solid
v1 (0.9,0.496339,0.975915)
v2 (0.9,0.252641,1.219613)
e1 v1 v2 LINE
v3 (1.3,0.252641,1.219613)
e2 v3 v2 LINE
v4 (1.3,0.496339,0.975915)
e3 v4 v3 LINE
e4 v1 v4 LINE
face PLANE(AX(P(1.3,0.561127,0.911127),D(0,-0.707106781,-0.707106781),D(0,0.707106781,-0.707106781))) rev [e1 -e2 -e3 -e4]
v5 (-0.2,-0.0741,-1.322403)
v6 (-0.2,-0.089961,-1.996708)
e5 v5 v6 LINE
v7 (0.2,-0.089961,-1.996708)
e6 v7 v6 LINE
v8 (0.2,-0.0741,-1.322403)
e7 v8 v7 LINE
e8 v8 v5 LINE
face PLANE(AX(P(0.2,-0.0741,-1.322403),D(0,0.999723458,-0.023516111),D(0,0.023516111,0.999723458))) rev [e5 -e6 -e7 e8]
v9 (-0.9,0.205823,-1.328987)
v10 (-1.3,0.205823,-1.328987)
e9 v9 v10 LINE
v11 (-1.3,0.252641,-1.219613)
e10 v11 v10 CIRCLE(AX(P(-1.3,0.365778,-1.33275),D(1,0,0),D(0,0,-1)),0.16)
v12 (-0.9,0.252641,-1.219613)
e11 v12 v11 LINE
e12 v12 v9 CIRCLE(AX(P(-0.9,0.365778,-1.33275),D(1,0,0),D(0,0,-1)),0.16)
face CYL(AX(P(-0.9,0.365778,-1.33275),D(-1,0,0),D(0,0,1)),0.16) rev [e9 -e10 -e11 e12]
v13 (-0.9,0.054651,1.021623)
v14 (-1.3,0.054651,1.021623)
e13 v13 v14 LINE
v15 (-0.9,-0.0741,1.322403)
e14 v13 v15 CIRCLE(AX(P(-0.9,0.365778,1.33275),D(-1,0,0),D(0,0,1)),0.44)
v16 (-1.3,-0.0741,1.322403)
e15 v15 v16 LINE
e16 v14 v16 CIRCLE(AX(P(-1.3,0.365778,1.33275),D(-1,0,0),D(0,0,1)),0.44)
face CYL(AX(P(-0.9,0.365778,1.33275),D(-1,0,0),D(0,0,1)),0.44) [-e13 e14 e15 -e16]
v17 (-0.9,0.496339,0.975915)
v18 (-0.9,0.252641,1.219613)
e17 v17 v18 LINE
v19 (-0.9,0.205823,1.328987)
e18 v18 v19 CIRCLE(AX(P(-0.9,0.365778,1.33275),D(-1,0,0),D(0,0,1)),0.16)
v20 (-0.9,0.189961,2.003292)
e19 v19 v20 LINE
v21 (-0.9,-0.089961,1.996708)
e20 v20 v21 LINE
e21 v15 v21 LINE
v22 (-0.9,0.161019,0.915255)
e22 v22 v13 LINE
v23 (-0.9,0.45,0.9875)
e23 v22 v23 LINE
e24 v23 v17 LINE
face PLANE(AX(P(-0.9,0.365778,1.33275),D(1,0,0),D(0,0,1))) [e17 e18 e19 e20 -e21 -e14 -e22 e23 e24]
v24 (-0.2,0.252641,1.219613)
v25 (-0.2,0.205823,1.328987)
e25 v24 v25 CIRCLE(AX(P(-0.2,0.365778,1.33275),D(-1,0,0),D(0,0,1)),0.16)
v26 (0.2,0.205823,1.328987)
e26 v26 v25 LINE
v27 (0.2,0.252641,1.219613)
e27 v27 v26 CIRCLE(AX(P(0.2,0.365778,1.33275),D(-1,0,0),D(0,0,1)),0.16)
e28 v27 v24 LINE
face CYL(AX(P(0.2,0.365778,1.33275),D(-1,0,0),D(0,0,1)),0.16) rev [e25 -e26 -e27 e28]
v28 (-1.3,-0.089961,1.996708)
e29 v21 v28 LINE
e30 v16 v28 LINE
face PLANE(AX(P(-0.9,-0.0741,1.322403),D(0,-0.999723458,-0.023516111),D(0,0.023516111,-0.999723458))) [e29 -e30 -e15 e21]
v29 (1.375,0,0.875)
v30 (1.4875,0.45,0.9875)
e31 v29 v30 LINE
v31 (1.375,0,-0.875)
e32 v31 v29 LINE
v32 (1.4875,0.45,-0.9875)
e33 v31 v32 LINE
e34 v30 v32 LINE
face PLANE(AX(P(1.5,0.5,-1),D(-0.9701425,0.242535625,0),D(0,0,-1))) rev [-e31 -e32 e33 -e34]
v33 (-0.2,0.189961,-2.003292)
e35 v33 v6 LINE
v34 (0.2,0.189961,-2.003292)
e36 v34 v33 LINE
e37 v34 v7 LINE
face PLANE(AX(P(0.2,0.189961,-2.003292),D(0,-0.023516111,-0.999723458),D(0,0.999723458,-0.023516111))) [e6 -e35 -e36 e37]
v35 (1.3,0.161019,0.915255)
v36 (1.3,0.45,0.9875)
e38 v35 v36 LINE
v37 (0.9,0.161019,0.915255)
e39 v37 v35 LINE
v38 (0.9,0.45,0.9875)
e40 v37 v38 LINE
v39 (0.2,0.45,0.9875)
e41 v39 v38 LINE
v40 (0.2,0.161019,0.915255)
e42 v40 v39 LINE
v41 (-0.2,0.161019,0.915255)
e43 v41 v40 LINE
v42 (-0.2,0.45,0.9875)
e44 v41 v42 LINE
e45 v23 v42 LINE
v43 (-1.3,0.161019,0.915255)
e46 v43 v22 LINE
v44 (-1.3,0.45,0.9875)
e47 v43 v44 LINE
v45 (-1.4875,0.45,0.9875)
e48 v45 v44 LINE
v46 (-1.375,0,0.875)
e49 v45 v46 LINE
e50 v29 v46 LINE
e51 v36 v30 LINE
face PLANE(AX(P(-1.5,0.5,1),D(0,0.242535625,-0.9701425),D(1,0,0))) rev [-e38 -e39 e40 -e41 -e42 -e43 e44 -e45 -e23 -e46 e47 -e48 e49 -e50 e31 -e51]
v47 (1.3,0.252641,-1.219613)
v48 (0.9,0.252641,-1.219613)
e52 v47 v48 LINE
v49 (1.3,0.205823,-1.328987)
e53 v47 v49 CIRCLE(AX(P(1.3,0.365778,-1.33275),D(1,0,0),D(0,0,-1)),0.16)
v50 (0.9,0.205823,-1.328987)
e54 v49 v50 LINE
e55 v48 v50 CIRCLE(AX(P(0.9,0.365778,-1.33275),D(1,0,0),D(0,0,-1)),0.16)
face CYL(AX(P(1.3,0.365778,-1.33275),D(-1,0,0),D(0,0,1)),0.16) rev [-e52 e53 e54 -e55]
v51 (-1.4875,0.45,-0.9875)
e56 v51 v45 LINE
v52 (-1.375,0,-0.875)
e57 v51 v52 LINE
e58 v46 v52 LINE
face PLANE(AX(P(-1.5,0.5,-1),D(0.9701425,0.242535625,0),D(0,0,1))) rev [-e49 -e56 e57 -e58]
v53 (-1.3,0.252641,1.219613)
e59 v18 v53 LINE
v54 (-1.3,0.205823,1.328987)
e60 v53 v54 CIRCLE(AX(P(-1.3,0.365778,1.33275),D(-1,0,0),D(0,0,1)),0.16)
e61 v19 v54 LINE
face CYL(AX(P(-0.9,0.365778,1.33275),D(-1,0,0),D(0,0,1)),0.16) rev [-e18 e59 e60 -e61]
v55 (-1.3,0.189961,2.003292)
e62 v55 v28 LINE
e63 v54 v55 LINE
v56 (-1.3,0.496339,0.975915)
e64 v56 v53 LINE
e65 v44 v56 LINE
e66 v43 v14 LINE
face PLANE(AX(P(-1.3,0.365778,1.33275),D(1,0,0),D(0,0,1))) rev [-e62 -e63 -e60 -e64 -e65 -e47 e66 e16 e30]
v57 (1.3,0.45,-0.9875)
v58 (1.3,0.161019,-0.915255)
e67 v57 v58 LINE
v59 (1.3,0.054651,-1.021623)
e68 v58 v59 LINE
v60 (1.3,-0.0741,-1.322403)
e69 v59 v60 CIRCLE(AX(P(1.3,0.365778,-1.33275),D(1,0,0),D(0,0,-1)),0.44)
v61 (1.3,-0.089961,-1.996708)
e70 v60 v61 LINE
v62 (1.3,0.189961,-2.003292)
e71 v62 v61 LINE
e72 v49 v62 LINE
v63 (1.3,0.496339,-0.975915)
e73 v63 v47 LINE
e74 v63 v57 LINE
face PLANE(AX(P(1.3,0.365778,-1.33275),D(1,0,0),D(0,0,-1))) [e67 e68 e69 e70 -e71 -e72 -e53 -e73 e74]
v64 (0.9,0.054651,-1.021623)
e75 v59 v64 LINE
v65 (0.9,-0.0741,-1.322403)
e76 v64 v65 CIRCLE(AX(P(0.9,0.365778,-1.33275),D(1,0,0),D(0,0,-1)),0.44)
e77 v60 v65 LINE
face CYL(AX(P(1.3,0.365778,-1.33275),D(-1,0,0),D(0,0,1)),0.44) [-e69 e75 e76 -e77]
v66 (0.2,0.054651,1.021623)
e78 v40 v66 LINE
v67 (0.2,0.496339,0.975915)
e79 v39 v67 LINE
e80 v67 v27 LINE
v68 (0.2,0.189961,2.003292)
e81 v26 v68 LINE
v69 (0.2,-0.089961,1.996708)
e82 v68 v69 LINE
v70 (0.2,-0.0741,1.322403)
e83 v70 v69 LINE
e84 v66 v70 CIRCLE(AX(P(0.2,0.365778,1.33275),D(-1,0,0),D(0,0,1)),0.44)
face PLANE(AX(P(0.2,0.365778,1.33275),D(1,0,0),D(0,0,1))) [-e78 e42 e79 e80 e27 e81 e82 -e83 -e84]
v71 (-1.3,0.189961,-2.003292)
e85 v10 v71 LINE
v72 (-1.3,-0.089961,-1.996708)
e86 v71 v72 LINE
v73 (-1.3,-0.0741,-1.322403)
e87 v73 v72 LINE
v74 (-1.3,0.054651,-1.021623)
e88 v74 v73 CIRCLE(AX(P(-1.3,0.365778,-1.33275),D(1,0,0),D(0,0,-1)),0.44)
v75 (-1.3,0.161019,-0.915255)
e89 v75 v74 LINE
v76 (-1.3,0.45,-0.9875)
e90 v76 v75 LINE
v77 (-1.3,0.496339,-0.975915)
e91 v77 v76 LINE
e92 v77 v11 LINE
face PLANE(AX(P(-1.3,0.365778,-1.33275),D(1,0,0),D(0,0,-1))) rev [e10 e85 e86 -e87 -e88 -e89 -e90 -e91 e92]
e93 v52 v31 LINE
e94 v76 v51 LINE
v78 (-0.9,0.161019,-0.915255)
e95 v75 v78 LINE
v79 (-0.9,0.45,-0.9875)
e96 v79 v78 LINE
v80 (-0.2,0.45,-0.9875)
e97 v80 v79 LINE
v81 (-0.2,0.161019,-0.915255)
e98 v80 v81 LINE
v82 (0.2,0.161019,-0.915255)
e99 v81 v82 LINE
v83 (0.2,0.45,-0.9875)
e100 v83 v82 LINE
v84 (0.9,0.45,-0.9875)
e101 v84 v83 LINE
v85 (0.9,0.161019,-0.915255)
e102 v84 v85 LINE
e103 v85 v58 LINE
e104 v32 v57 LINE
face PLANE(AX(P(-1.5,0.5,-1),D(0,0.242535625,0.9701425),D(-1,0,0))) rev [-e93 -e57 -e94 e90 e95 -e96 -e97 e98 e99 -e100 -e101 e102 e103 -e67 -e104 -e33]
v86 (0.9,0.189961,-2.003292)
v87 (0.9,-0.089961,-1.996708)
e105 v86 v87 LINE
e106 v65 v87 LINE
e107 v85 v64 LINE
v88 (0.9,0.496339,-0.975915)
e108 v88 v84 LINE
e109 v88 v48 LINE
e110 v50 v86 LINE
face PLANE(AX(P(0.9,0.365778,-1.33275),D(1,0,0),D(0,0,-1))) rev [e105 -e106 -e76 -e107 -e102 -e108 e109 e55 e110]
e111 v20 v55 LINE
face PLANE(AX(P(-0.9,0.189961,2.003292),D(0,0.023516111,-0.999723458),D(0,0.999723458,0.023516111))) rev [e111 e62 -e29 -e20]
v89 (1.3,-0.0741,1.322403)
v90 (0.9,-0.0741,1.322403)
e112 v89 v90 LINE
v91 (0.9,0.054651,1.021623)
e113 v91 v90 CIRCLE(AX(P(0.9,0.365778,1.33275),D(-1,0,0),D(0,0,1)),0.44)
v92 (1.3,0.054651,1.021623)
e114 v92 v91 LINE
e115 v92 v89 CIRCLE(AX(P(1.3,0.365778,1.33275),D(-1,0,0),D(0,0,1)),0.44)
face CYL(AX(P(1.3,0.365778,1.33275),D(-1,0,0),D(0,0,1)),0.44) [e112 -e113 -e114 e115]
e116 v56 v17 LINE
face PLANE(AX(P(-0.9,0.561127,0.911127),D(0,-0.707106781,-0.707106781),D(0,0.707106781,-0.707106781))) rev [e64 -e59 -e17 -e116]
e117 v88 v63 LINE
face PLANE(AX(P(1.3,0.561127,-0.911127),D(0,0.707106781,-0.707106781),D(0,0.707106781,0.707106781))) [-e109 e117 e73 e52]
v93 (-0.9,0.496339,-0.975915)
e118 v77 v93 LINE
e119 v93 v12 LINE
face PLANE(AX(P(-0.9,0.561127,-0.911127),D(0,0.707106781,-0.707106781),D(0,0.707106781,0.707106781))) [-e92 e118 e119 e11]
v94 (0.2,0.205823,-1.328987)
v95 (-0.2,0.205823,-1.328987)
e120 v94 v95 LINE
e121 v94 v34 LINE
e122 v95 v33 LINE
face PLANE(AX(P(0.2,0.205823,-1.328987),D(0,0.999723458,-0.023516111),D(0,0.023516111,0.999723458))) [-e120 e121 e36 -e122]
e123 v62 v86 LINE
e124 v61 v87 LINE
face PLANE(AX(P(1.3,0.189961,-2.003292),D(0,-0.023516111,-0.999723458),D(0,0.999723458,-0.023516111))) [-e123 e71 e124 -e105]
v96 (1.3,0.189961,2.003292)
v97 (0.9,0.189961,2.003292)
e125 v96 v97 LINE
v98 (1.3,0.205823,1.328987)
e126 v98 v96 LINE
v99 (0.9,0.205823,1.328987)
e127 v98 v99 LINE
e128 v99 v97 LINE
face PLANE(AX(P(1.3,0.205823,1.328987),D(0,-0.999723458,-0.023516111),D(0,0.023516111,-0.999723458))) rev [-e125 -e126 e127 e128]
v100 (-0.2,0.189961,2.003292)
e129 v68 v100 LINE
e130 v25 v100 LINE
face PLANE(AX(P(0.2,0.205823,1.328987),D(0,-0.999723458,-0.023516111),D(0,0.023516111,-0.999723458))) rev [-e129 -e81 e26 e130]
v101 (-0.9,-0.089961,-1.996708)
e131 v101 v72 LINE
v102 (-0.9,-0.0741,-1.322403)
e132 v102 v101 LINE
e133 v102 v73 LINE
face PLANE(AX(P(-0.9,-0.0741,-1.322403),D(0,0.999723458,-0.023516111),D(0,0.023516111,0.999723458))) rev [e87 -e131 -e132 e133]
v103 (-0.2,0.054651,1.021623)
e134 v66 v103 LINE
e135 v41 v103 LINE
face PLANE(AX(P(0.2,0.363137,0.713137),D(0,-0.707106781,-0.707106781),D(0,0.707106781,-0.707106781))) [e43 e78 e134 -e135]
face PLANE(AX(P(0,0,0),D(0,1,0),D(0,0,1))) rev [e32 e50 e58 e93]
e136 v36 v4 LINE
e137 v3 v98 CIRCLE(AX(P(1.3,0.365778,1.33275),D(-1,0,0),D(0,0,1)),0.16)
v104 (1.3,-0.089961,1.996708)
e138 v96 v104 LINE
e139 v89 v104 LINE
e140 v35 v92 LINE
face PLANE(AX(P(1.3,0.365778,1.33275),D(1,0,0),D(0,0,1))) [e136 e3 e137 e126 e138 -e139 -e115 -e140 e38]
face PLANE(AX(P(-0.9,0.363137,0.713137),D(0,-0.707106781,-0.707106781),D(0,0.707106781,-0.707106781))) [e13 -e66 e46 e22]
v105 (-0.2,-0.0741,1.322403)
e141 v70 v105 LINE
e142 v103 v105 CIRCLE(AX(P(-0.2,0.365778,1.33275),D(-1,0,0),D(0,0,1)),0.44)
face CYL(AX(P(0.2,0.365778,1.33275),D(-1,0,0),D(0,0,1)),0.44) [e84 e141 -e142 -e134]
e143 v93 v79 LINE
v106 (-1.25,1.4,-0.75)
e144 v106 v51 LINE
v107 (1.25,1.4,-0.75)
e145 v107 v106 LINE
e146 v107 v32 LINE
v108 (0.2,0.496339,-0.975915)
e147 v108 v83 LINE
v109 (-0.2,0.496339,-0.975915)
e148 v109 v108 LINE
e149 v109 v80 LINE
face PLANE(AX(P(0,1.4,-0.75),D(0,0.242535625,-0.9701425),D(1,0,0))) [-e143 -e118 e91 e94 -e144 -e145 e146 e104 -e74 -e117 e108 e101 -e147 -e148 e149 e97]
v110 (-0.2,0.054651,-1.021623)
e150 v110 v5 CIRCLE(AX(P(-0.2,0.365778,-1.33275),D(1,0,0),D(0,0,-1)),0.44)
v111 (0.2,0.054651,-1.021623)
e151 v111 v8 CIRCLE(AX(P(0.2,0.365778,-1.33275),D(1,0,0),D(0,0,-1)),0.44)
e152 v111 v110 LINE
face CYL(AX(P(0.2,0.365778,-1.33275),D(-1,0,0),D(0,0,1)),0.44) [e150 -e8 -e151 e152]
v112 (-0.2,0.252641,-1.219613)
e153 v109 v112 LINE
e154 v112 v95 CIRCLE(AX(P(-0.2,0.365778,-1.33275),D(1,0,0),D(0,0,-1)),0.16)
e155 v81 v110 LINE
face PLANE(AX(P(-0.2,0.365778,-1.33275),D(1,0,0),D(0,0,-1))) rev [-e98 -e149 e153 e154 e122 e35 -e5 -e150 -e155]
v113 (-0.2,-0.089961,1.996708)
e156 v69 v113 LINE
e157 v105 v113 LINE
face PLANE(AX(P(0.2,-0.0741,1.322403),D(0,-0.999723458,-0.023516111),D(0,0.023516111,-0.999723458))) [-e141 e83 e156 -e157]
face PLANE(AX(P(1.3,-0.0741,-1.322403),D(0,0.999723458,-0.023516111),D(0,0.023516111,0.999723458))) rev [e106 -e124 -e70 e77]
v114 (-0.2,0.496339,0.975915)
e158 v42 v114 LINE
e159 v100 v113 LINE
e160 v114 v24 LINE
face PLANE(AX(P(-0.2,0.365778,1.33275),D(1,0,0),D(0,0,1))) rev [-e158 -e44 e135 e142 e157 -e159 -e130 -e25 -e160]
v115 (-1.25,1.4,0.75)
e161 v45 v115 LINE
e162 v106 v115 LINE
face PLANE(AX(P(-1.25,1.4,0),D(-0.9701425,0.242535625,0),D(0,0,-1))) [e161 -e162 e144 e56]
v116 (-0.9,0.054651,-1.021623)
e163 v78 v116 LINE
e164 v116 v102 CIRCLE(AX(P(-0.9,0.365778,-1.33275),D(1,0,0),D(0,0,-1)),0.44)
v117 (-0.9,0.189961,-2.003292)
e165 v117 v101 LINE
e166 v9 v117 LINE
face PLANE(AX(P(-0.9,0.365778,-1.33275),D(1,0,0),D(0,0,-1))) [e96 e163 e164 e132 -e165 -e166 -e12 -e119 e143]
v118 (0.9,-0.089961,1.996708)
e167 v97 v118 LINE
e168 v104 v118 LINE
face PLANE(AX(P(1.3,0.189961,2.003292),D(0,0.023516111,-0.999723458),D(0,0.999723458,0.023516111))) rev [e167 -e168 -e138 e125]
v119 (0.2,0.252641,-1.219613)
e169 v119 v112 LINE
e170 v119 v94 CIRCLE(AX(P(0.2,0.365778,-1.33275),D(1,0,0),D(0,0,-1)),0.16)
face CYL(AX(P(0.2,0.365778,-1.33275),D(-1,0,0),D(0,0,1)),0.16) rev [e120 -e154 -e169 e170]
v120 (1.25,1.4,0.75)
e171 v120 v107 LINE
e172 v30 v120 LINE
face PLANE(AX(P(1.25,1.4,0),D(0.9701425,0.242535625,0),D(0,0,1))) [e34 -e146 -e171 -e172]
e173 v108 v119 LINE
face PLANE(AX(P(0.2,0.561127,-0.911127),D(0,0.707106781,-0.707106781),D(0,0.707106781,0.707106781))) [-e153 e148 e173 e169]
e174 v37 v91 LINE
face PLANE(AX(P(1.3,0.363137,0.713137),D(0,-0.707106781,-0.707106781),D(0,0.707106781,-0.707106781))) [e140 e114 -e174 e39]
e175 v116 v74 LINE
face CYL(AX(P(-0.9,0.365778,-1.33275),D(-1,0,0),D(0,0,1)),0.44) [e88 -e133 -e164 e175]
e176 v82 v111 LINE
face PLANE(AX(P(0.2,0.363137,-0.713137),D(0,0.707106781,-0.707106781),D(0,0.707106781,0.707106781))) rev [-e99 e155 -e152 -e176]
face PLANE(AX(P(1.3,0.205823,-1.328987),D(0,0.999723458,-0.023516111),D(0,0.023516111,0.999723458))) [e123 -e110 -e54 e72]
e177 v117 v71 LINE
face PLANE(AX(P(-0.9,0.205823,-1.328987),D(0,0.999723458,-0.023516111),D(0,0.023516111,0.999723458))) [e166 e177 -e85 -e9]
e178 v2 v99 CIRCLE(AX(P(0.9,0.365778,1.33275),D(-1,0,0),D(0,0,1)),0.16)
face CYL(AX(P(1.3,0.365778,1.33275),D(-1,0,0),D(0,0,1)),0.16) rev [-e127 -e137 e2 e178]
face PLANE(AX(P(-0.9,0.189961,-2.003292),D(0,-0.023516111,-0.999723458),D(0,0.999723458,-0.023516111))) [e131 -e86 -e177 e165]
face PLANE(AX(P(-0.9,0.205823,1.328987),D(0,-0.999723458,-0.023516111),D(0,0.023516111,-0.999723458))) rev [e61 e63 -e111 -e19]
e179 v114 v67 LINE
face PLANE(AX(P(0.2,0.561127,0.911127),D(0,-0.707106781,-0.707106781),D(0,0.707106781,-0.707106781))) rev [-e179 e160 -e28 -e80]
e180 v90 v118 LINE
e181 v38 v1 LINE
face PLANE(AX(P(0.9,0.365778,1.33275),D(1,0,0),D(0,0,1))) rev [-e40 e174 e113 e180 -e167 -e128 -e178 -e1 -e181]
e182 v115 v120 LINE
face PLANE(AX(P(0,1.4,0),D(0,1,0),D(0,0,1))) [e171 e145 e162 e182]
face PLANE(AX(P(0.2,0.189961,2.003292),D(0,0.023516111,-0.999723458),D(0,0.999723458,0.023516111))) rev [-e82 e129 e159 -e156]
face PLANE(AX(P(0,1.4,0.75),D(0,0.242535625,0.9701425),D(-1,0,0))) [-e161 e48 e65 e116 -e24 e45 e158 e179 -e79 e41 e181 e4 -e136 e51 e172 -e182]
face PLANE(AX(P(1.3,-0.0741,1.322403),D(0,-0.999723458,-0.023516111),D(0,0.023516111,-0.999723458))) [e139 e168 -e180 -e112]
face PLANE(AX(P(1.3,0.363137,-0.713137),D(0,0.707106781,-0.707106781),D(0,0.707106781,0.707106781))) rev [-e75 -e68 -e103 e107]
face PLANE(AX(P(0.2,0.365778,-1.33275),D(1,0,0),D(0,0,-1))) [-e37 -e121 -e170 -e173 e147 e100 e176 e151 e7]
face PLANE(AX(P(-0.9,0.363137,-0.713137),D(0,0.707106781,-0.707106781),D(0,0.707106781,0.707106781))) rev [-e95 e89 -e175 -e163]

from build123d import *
from OCP.BRepFilletAPI import BRepFilletAPI_MakeChamfer

# Parameters (mm, degrees)
SKETCH1_W            = 3
SKETCH1_H            = 2
IC_DEPTH             = 1.4
IC_TC_SIZE           = 1
IC_TC_SIZE2          = 0.25
IC_BC_SIZE           = 0.125
IC_BC_SIZE_2         = 0.5
LEG_EXTRUDED_DEPTH   = 0.2
LEG_P_COUNT          = 2
LEG_P_PITCH          = 1.1
LEG_P_COL_COUNT      = 2
LEG_P_COL_PITCH      = 1.1
MIRROR1_COPY_1_DEPTH = 0.2
MIRROR1_COPY_2_DEPTH = 0.2


with BuildPart() as part:
    # Sketch1 → IC (new body)
    with BuildSketch(Plane(origin=(0, 0, 0), x_dir=(1, 0, 0), z_dir=(0, 1, 0))):
        Rectangle(SKETCH1_W, SKETCH1_H)
    extrude(amount=IC_DEPTH)

    # IC TC: one chamfer whose edges measure the first distance from different faces: ONE call of the kernel's chamfer builder (chamfer() names one face for all edges)
    ic_tc_edges_1 = [part.edges().sort_by_distance(p)[0] for p in [
        (1.5, 1.4, 0),
    ]]
    ic_tc_side_1 = [part.faces().sort_by_distance(p)[0] for p in [
        (1.5, 0.7, 0),
    ]]
    ic_tc_edges_2 = [part.edges().sort_by_distance(p)[0] for p in [
        (0, 1.4, -1),
    ]]
    ic_tc_side_2 = [part.faces().sort_by_distance(p)[0] for p in [
        (0, 0.7, -1),
    ]]
    ic_tc_edges_3 = [part.edges().sort_by_distance(p)[0] for p in [
        (-1.5, 1.4, 0),
    ]]
    ic_tc_side_3 = [part.faces().sort_by_distance(p)[0] for p in [
        (-1.5, 0.7, 0),
    ]]
    ic_tc_edges_4 = [part.edges().sort_by_distance(p)[0] for p in [
        (0, 1.4, 1),
    ]]
    ic_tc_side_4 = [part.faces().sort_by_distance(p)[0] for p in [
        (0, 0.7, 1),
    ]]
    ic_tc = BRepFilletAPI_MakeChamfer(part.part.solid().wrapped)
    for e in ic_tc_edges_1:
        ic_tc.Add(IC_TC_SIZE, IC_TC_SIZE2, e.wrapped, ic_tc_side_1[0].wrapped)  # the first distance lies on this face
    for e in ic_tc_edges_2:
        ic_tc.Add(IC_TC_SIZE, IC_TC_SIZE2, e.wrapped, ic_tc_side_2[0].wrapped)  # the first distance lies on this face
    for e in ic_tc_edges_3:
        ic_tc.Add(IC_TC_SIZE, IC_TC_SIZE2, e.wrapped, ic_tc_side_3[0].wrapped)  # the first distance lies on this face
    for e in ic_tc_edges_4:
        ic_tc.Add(IC_TC_SIZE, IC_TC_SIZE2, e.wrapped, ic_tc_side_4[0].wrapped)  # the first distance lies on this face
    add(Compound.cast(ic_tc.Shape()), mode=Mode.REPLACE)

    # IC BC
    # the kernel refuses this chamfer: 0.5, 0.125 mm, written as the material it takes off along each edge
    with BuildSketch(Plane(origin=(2.79856375, 0, 1), x_dir=(0, -0.1477835663365713, -0.9890197255468893), z_dir=(-1, 0, 0))) as ic_bc_piece_1:
        Polygon((IC_BC_SIZE * 0.989019725547, -IC_BC_SIZE * 0.147783566337), (-IC_BC_SIZE_2 * 0.147783566337, -IC_BC_SIZE_2 * 0.989019725547), (0, 0), align=None)
    extrude(amount=5.5971275, mode=Mode.SUBTRACT)
    with BuildSketch(Plane(origin=(-1.5, 0, 2.29856375), x_dir=(-0.00933861064031752, 0.9999563942249224, 0), z_dir=(0, 0, -1))) as ic_bc_piece_2:
        Polygon((IC_BC_SIZE_2 * 0.999956394225, IC_BC_SIZE_2 * 0.00933861064032), (-IC_BC_SIZE * 0.00933861064032, IC_BC_SIZE * 0.999956394225), (0, 0), align=None)
    extrude(amount=4.5971275, mode=Mode.SUBTRACT)
    with BuildSketch(Plane(origin=(-2.79856375, 0, -1), x_dir=(0, 0.9999563942249224, -0.00933861064031752), z_dir=(1, 0, 0))) as ic_bc_piece_3:
        Polygon((IC_BC_SIZE_2 * 0.999956394225, IC_BC_SIZE_2 * 0.00933861064032), (-IC_BC_SIZE * 0.00933861064032, IC_BC_SIZE * 0.999956394225), (0, 0), align=None)
    extrude(amount=5.5971275, mode=Mode.SUBTRACT)
    with BuildSketch(Plane(origin=(1.5, 0, -2.29856375), x_dir=(-0.9890197255468893, -0.1477835663365713, 0), z_dir=(0, 0, 1))) as ic_bc_piece_4:
        Polygon((IC_BC_SIZE * 0.989019725547, -IC_BC_SIZE * 0.147783566337), (-IC_BC_SIZE_2 * 0.147783566337, -IC_BC_SIZE_2 * 0.989019725547), (0, 0), align=None)
    extrude(amount=4.5971275, mode=Mode.SUBTRACT)

    # Sketch3 → LEG EXTRUDED (add, symmetric)
    with BuildSketch(Plane(origin=(0, 0, 0), x_dir=(0, 0, -1), z_dir=(1, 0, 0))):
        with BuildLine():
            Line((0, 0.41), (0.6, 0.41))
            ThreePointArc((0.6, 0.41), (0.661229349, 0.397820725), (0.713137085, 0.363137085))
            Line((0.713137085, 0.363137085), (1.021622695, 0.054651475))
            ThreePointArc((1.021622695, 0.054651475), (1.159600548, -0.038720464), (1.32240259, -0.074099863))
            Line((1.32240259, -0.074099863), (1.996707745, -0.089961284))
            Line((1.996707745, -0.089961284), (2.003292255, 0.189961284))
            Line((2.003292255, 0.189961284), (1.328987101, 0.205822705))
            ThreePointArc((1.328987101, 0.205822705), (1.269786359, 0.218687941), (1.219612594, 0.252641373))
            Line((1.219612594, 0.252641373), (0.911126984, 0.561126984))
            ThreePointArc((0.911126984, 0.561126984), (0.76838071, 0.656506994), (0.6, 0.69))
            Line((0.6, 0.69), (0, 0.69))
            Line((0, 0.69), (0, 0.41))
        make_face()
    leg_extruded = extrude(amount=LEG_EXTRUDED_DEPTH, both=True)

    # LEG P: LEG EXTRUDED ×2
    with Locations(*[(-i * LEG_P_PITCH, 0, 0) for i in range(1, LEG_P_COUNT)]):
        add(leg_extruded)

    # LEG P col: LEG EXTRUDED ×2
    with Locations(*[(i * LEG_P_COL_PITCH, 0, 0) for i in range(1, LEG_P_COL_COUNT)]):
        add(leg_extruded)

    # Mirror1: LEG EXTRUDED across plane
    add(leg_extruded.mirror(Plane.XY))

    # Mirror1 copy 1 sketch → Mirror1 copy 1 (add, symmetric)
    with BuildSketch(Plane(origin=(-1.1, 0, 0), x_dir=(0, 0, 1), z_dir=(1, 0, 0))):
        with BuildLine():
            Line((0, -0.41), (0.6, -0.41))
            ThreePointArc((0.6, -0.41), (0.661229349, -0.397820725), (0.713137085, -0.363137085))
            Line((0.713137085, -0.363137085), (1.021622695, -0.054651475))
            ThreePointArc((1.021622695, -0.054651475), (1.159600548, 0.038720464), (1.32240259, 0.074099863))
            Line((1.32240259, 0.074099863), (1.996707745, 0.089961284))
            Line((1.996707745, 0.089961284), (2.003292255, -0.189961284))
            Line((2.003292255, -0.189961284), (1.328987101, -0.205822705))
            ThreePointArc((1.328987101, -0.205822705), (1.269786359, -0.218687941), (1.219612594, -0.252641373))
            Line((1.219612594, -0.252641373), (0.911126984, -0.561126984))
            ThreePointArc((0.911126984, -0.561126984), (0.76838071, -0.656506994), (0.6, -0.69))
            Line((0.6, -0.69), (0, -0.69))
            Line((0, -0.69), (0, -0.41))
        make_face()
    extrude(amount=MIRROR1_COPY_1_DEPTH, both=True)

    # Mirror1 copy 2 sketch → Mirror1 copy 2 (add, symmetric)
    with BuildSketch(Plane(origin=(1.1, 0, 0), x_dir=(0, 0, 1), z_dir=(1, 0, 0))):
        with BuildLine():
            Line((0, -0.41), (0.6, -0.41))
            ThreePointArc((0.6, -0.41), (0.661229349, -0.397820725), (0.713137085, -0.363137085))
            Line((0.713137085, -0.363137085), (1.021622695, -0.054651475))
            ThreePointArc((1.021622695, -0.054651475), (1.159600548, 0.038720464), (1.32240259, 0.074099863))
            Line((1.32240259, 0.074099863), (1.996707745, 0.089961284))
            Line((1.996707745, 0.089961284), (2.003292255, -0.189961284))
            Line((2.003292255, -0.189961284), (1.328987101, -0.205822705))
            ThreePointArc((1.328987101, -0.205822705), (1.269786359, -0.218687941), (1.219612594, -0.252641373))
            Line((1.219612594, -0.252641373), (0.911126984, -0.561126984))
            ThreePointArc((0.911126984, -0.561126984), (0.76838071, -0.656506994), (0.6, -0.69))
            Line((0.6, -0.69), (0, -0.69))
            Line((0, -0.69), (0, -0.41))
        make_face()
    extrude(amount=MIRROR1_COPY_2_DEPTH, both=True)


solid = part.part
